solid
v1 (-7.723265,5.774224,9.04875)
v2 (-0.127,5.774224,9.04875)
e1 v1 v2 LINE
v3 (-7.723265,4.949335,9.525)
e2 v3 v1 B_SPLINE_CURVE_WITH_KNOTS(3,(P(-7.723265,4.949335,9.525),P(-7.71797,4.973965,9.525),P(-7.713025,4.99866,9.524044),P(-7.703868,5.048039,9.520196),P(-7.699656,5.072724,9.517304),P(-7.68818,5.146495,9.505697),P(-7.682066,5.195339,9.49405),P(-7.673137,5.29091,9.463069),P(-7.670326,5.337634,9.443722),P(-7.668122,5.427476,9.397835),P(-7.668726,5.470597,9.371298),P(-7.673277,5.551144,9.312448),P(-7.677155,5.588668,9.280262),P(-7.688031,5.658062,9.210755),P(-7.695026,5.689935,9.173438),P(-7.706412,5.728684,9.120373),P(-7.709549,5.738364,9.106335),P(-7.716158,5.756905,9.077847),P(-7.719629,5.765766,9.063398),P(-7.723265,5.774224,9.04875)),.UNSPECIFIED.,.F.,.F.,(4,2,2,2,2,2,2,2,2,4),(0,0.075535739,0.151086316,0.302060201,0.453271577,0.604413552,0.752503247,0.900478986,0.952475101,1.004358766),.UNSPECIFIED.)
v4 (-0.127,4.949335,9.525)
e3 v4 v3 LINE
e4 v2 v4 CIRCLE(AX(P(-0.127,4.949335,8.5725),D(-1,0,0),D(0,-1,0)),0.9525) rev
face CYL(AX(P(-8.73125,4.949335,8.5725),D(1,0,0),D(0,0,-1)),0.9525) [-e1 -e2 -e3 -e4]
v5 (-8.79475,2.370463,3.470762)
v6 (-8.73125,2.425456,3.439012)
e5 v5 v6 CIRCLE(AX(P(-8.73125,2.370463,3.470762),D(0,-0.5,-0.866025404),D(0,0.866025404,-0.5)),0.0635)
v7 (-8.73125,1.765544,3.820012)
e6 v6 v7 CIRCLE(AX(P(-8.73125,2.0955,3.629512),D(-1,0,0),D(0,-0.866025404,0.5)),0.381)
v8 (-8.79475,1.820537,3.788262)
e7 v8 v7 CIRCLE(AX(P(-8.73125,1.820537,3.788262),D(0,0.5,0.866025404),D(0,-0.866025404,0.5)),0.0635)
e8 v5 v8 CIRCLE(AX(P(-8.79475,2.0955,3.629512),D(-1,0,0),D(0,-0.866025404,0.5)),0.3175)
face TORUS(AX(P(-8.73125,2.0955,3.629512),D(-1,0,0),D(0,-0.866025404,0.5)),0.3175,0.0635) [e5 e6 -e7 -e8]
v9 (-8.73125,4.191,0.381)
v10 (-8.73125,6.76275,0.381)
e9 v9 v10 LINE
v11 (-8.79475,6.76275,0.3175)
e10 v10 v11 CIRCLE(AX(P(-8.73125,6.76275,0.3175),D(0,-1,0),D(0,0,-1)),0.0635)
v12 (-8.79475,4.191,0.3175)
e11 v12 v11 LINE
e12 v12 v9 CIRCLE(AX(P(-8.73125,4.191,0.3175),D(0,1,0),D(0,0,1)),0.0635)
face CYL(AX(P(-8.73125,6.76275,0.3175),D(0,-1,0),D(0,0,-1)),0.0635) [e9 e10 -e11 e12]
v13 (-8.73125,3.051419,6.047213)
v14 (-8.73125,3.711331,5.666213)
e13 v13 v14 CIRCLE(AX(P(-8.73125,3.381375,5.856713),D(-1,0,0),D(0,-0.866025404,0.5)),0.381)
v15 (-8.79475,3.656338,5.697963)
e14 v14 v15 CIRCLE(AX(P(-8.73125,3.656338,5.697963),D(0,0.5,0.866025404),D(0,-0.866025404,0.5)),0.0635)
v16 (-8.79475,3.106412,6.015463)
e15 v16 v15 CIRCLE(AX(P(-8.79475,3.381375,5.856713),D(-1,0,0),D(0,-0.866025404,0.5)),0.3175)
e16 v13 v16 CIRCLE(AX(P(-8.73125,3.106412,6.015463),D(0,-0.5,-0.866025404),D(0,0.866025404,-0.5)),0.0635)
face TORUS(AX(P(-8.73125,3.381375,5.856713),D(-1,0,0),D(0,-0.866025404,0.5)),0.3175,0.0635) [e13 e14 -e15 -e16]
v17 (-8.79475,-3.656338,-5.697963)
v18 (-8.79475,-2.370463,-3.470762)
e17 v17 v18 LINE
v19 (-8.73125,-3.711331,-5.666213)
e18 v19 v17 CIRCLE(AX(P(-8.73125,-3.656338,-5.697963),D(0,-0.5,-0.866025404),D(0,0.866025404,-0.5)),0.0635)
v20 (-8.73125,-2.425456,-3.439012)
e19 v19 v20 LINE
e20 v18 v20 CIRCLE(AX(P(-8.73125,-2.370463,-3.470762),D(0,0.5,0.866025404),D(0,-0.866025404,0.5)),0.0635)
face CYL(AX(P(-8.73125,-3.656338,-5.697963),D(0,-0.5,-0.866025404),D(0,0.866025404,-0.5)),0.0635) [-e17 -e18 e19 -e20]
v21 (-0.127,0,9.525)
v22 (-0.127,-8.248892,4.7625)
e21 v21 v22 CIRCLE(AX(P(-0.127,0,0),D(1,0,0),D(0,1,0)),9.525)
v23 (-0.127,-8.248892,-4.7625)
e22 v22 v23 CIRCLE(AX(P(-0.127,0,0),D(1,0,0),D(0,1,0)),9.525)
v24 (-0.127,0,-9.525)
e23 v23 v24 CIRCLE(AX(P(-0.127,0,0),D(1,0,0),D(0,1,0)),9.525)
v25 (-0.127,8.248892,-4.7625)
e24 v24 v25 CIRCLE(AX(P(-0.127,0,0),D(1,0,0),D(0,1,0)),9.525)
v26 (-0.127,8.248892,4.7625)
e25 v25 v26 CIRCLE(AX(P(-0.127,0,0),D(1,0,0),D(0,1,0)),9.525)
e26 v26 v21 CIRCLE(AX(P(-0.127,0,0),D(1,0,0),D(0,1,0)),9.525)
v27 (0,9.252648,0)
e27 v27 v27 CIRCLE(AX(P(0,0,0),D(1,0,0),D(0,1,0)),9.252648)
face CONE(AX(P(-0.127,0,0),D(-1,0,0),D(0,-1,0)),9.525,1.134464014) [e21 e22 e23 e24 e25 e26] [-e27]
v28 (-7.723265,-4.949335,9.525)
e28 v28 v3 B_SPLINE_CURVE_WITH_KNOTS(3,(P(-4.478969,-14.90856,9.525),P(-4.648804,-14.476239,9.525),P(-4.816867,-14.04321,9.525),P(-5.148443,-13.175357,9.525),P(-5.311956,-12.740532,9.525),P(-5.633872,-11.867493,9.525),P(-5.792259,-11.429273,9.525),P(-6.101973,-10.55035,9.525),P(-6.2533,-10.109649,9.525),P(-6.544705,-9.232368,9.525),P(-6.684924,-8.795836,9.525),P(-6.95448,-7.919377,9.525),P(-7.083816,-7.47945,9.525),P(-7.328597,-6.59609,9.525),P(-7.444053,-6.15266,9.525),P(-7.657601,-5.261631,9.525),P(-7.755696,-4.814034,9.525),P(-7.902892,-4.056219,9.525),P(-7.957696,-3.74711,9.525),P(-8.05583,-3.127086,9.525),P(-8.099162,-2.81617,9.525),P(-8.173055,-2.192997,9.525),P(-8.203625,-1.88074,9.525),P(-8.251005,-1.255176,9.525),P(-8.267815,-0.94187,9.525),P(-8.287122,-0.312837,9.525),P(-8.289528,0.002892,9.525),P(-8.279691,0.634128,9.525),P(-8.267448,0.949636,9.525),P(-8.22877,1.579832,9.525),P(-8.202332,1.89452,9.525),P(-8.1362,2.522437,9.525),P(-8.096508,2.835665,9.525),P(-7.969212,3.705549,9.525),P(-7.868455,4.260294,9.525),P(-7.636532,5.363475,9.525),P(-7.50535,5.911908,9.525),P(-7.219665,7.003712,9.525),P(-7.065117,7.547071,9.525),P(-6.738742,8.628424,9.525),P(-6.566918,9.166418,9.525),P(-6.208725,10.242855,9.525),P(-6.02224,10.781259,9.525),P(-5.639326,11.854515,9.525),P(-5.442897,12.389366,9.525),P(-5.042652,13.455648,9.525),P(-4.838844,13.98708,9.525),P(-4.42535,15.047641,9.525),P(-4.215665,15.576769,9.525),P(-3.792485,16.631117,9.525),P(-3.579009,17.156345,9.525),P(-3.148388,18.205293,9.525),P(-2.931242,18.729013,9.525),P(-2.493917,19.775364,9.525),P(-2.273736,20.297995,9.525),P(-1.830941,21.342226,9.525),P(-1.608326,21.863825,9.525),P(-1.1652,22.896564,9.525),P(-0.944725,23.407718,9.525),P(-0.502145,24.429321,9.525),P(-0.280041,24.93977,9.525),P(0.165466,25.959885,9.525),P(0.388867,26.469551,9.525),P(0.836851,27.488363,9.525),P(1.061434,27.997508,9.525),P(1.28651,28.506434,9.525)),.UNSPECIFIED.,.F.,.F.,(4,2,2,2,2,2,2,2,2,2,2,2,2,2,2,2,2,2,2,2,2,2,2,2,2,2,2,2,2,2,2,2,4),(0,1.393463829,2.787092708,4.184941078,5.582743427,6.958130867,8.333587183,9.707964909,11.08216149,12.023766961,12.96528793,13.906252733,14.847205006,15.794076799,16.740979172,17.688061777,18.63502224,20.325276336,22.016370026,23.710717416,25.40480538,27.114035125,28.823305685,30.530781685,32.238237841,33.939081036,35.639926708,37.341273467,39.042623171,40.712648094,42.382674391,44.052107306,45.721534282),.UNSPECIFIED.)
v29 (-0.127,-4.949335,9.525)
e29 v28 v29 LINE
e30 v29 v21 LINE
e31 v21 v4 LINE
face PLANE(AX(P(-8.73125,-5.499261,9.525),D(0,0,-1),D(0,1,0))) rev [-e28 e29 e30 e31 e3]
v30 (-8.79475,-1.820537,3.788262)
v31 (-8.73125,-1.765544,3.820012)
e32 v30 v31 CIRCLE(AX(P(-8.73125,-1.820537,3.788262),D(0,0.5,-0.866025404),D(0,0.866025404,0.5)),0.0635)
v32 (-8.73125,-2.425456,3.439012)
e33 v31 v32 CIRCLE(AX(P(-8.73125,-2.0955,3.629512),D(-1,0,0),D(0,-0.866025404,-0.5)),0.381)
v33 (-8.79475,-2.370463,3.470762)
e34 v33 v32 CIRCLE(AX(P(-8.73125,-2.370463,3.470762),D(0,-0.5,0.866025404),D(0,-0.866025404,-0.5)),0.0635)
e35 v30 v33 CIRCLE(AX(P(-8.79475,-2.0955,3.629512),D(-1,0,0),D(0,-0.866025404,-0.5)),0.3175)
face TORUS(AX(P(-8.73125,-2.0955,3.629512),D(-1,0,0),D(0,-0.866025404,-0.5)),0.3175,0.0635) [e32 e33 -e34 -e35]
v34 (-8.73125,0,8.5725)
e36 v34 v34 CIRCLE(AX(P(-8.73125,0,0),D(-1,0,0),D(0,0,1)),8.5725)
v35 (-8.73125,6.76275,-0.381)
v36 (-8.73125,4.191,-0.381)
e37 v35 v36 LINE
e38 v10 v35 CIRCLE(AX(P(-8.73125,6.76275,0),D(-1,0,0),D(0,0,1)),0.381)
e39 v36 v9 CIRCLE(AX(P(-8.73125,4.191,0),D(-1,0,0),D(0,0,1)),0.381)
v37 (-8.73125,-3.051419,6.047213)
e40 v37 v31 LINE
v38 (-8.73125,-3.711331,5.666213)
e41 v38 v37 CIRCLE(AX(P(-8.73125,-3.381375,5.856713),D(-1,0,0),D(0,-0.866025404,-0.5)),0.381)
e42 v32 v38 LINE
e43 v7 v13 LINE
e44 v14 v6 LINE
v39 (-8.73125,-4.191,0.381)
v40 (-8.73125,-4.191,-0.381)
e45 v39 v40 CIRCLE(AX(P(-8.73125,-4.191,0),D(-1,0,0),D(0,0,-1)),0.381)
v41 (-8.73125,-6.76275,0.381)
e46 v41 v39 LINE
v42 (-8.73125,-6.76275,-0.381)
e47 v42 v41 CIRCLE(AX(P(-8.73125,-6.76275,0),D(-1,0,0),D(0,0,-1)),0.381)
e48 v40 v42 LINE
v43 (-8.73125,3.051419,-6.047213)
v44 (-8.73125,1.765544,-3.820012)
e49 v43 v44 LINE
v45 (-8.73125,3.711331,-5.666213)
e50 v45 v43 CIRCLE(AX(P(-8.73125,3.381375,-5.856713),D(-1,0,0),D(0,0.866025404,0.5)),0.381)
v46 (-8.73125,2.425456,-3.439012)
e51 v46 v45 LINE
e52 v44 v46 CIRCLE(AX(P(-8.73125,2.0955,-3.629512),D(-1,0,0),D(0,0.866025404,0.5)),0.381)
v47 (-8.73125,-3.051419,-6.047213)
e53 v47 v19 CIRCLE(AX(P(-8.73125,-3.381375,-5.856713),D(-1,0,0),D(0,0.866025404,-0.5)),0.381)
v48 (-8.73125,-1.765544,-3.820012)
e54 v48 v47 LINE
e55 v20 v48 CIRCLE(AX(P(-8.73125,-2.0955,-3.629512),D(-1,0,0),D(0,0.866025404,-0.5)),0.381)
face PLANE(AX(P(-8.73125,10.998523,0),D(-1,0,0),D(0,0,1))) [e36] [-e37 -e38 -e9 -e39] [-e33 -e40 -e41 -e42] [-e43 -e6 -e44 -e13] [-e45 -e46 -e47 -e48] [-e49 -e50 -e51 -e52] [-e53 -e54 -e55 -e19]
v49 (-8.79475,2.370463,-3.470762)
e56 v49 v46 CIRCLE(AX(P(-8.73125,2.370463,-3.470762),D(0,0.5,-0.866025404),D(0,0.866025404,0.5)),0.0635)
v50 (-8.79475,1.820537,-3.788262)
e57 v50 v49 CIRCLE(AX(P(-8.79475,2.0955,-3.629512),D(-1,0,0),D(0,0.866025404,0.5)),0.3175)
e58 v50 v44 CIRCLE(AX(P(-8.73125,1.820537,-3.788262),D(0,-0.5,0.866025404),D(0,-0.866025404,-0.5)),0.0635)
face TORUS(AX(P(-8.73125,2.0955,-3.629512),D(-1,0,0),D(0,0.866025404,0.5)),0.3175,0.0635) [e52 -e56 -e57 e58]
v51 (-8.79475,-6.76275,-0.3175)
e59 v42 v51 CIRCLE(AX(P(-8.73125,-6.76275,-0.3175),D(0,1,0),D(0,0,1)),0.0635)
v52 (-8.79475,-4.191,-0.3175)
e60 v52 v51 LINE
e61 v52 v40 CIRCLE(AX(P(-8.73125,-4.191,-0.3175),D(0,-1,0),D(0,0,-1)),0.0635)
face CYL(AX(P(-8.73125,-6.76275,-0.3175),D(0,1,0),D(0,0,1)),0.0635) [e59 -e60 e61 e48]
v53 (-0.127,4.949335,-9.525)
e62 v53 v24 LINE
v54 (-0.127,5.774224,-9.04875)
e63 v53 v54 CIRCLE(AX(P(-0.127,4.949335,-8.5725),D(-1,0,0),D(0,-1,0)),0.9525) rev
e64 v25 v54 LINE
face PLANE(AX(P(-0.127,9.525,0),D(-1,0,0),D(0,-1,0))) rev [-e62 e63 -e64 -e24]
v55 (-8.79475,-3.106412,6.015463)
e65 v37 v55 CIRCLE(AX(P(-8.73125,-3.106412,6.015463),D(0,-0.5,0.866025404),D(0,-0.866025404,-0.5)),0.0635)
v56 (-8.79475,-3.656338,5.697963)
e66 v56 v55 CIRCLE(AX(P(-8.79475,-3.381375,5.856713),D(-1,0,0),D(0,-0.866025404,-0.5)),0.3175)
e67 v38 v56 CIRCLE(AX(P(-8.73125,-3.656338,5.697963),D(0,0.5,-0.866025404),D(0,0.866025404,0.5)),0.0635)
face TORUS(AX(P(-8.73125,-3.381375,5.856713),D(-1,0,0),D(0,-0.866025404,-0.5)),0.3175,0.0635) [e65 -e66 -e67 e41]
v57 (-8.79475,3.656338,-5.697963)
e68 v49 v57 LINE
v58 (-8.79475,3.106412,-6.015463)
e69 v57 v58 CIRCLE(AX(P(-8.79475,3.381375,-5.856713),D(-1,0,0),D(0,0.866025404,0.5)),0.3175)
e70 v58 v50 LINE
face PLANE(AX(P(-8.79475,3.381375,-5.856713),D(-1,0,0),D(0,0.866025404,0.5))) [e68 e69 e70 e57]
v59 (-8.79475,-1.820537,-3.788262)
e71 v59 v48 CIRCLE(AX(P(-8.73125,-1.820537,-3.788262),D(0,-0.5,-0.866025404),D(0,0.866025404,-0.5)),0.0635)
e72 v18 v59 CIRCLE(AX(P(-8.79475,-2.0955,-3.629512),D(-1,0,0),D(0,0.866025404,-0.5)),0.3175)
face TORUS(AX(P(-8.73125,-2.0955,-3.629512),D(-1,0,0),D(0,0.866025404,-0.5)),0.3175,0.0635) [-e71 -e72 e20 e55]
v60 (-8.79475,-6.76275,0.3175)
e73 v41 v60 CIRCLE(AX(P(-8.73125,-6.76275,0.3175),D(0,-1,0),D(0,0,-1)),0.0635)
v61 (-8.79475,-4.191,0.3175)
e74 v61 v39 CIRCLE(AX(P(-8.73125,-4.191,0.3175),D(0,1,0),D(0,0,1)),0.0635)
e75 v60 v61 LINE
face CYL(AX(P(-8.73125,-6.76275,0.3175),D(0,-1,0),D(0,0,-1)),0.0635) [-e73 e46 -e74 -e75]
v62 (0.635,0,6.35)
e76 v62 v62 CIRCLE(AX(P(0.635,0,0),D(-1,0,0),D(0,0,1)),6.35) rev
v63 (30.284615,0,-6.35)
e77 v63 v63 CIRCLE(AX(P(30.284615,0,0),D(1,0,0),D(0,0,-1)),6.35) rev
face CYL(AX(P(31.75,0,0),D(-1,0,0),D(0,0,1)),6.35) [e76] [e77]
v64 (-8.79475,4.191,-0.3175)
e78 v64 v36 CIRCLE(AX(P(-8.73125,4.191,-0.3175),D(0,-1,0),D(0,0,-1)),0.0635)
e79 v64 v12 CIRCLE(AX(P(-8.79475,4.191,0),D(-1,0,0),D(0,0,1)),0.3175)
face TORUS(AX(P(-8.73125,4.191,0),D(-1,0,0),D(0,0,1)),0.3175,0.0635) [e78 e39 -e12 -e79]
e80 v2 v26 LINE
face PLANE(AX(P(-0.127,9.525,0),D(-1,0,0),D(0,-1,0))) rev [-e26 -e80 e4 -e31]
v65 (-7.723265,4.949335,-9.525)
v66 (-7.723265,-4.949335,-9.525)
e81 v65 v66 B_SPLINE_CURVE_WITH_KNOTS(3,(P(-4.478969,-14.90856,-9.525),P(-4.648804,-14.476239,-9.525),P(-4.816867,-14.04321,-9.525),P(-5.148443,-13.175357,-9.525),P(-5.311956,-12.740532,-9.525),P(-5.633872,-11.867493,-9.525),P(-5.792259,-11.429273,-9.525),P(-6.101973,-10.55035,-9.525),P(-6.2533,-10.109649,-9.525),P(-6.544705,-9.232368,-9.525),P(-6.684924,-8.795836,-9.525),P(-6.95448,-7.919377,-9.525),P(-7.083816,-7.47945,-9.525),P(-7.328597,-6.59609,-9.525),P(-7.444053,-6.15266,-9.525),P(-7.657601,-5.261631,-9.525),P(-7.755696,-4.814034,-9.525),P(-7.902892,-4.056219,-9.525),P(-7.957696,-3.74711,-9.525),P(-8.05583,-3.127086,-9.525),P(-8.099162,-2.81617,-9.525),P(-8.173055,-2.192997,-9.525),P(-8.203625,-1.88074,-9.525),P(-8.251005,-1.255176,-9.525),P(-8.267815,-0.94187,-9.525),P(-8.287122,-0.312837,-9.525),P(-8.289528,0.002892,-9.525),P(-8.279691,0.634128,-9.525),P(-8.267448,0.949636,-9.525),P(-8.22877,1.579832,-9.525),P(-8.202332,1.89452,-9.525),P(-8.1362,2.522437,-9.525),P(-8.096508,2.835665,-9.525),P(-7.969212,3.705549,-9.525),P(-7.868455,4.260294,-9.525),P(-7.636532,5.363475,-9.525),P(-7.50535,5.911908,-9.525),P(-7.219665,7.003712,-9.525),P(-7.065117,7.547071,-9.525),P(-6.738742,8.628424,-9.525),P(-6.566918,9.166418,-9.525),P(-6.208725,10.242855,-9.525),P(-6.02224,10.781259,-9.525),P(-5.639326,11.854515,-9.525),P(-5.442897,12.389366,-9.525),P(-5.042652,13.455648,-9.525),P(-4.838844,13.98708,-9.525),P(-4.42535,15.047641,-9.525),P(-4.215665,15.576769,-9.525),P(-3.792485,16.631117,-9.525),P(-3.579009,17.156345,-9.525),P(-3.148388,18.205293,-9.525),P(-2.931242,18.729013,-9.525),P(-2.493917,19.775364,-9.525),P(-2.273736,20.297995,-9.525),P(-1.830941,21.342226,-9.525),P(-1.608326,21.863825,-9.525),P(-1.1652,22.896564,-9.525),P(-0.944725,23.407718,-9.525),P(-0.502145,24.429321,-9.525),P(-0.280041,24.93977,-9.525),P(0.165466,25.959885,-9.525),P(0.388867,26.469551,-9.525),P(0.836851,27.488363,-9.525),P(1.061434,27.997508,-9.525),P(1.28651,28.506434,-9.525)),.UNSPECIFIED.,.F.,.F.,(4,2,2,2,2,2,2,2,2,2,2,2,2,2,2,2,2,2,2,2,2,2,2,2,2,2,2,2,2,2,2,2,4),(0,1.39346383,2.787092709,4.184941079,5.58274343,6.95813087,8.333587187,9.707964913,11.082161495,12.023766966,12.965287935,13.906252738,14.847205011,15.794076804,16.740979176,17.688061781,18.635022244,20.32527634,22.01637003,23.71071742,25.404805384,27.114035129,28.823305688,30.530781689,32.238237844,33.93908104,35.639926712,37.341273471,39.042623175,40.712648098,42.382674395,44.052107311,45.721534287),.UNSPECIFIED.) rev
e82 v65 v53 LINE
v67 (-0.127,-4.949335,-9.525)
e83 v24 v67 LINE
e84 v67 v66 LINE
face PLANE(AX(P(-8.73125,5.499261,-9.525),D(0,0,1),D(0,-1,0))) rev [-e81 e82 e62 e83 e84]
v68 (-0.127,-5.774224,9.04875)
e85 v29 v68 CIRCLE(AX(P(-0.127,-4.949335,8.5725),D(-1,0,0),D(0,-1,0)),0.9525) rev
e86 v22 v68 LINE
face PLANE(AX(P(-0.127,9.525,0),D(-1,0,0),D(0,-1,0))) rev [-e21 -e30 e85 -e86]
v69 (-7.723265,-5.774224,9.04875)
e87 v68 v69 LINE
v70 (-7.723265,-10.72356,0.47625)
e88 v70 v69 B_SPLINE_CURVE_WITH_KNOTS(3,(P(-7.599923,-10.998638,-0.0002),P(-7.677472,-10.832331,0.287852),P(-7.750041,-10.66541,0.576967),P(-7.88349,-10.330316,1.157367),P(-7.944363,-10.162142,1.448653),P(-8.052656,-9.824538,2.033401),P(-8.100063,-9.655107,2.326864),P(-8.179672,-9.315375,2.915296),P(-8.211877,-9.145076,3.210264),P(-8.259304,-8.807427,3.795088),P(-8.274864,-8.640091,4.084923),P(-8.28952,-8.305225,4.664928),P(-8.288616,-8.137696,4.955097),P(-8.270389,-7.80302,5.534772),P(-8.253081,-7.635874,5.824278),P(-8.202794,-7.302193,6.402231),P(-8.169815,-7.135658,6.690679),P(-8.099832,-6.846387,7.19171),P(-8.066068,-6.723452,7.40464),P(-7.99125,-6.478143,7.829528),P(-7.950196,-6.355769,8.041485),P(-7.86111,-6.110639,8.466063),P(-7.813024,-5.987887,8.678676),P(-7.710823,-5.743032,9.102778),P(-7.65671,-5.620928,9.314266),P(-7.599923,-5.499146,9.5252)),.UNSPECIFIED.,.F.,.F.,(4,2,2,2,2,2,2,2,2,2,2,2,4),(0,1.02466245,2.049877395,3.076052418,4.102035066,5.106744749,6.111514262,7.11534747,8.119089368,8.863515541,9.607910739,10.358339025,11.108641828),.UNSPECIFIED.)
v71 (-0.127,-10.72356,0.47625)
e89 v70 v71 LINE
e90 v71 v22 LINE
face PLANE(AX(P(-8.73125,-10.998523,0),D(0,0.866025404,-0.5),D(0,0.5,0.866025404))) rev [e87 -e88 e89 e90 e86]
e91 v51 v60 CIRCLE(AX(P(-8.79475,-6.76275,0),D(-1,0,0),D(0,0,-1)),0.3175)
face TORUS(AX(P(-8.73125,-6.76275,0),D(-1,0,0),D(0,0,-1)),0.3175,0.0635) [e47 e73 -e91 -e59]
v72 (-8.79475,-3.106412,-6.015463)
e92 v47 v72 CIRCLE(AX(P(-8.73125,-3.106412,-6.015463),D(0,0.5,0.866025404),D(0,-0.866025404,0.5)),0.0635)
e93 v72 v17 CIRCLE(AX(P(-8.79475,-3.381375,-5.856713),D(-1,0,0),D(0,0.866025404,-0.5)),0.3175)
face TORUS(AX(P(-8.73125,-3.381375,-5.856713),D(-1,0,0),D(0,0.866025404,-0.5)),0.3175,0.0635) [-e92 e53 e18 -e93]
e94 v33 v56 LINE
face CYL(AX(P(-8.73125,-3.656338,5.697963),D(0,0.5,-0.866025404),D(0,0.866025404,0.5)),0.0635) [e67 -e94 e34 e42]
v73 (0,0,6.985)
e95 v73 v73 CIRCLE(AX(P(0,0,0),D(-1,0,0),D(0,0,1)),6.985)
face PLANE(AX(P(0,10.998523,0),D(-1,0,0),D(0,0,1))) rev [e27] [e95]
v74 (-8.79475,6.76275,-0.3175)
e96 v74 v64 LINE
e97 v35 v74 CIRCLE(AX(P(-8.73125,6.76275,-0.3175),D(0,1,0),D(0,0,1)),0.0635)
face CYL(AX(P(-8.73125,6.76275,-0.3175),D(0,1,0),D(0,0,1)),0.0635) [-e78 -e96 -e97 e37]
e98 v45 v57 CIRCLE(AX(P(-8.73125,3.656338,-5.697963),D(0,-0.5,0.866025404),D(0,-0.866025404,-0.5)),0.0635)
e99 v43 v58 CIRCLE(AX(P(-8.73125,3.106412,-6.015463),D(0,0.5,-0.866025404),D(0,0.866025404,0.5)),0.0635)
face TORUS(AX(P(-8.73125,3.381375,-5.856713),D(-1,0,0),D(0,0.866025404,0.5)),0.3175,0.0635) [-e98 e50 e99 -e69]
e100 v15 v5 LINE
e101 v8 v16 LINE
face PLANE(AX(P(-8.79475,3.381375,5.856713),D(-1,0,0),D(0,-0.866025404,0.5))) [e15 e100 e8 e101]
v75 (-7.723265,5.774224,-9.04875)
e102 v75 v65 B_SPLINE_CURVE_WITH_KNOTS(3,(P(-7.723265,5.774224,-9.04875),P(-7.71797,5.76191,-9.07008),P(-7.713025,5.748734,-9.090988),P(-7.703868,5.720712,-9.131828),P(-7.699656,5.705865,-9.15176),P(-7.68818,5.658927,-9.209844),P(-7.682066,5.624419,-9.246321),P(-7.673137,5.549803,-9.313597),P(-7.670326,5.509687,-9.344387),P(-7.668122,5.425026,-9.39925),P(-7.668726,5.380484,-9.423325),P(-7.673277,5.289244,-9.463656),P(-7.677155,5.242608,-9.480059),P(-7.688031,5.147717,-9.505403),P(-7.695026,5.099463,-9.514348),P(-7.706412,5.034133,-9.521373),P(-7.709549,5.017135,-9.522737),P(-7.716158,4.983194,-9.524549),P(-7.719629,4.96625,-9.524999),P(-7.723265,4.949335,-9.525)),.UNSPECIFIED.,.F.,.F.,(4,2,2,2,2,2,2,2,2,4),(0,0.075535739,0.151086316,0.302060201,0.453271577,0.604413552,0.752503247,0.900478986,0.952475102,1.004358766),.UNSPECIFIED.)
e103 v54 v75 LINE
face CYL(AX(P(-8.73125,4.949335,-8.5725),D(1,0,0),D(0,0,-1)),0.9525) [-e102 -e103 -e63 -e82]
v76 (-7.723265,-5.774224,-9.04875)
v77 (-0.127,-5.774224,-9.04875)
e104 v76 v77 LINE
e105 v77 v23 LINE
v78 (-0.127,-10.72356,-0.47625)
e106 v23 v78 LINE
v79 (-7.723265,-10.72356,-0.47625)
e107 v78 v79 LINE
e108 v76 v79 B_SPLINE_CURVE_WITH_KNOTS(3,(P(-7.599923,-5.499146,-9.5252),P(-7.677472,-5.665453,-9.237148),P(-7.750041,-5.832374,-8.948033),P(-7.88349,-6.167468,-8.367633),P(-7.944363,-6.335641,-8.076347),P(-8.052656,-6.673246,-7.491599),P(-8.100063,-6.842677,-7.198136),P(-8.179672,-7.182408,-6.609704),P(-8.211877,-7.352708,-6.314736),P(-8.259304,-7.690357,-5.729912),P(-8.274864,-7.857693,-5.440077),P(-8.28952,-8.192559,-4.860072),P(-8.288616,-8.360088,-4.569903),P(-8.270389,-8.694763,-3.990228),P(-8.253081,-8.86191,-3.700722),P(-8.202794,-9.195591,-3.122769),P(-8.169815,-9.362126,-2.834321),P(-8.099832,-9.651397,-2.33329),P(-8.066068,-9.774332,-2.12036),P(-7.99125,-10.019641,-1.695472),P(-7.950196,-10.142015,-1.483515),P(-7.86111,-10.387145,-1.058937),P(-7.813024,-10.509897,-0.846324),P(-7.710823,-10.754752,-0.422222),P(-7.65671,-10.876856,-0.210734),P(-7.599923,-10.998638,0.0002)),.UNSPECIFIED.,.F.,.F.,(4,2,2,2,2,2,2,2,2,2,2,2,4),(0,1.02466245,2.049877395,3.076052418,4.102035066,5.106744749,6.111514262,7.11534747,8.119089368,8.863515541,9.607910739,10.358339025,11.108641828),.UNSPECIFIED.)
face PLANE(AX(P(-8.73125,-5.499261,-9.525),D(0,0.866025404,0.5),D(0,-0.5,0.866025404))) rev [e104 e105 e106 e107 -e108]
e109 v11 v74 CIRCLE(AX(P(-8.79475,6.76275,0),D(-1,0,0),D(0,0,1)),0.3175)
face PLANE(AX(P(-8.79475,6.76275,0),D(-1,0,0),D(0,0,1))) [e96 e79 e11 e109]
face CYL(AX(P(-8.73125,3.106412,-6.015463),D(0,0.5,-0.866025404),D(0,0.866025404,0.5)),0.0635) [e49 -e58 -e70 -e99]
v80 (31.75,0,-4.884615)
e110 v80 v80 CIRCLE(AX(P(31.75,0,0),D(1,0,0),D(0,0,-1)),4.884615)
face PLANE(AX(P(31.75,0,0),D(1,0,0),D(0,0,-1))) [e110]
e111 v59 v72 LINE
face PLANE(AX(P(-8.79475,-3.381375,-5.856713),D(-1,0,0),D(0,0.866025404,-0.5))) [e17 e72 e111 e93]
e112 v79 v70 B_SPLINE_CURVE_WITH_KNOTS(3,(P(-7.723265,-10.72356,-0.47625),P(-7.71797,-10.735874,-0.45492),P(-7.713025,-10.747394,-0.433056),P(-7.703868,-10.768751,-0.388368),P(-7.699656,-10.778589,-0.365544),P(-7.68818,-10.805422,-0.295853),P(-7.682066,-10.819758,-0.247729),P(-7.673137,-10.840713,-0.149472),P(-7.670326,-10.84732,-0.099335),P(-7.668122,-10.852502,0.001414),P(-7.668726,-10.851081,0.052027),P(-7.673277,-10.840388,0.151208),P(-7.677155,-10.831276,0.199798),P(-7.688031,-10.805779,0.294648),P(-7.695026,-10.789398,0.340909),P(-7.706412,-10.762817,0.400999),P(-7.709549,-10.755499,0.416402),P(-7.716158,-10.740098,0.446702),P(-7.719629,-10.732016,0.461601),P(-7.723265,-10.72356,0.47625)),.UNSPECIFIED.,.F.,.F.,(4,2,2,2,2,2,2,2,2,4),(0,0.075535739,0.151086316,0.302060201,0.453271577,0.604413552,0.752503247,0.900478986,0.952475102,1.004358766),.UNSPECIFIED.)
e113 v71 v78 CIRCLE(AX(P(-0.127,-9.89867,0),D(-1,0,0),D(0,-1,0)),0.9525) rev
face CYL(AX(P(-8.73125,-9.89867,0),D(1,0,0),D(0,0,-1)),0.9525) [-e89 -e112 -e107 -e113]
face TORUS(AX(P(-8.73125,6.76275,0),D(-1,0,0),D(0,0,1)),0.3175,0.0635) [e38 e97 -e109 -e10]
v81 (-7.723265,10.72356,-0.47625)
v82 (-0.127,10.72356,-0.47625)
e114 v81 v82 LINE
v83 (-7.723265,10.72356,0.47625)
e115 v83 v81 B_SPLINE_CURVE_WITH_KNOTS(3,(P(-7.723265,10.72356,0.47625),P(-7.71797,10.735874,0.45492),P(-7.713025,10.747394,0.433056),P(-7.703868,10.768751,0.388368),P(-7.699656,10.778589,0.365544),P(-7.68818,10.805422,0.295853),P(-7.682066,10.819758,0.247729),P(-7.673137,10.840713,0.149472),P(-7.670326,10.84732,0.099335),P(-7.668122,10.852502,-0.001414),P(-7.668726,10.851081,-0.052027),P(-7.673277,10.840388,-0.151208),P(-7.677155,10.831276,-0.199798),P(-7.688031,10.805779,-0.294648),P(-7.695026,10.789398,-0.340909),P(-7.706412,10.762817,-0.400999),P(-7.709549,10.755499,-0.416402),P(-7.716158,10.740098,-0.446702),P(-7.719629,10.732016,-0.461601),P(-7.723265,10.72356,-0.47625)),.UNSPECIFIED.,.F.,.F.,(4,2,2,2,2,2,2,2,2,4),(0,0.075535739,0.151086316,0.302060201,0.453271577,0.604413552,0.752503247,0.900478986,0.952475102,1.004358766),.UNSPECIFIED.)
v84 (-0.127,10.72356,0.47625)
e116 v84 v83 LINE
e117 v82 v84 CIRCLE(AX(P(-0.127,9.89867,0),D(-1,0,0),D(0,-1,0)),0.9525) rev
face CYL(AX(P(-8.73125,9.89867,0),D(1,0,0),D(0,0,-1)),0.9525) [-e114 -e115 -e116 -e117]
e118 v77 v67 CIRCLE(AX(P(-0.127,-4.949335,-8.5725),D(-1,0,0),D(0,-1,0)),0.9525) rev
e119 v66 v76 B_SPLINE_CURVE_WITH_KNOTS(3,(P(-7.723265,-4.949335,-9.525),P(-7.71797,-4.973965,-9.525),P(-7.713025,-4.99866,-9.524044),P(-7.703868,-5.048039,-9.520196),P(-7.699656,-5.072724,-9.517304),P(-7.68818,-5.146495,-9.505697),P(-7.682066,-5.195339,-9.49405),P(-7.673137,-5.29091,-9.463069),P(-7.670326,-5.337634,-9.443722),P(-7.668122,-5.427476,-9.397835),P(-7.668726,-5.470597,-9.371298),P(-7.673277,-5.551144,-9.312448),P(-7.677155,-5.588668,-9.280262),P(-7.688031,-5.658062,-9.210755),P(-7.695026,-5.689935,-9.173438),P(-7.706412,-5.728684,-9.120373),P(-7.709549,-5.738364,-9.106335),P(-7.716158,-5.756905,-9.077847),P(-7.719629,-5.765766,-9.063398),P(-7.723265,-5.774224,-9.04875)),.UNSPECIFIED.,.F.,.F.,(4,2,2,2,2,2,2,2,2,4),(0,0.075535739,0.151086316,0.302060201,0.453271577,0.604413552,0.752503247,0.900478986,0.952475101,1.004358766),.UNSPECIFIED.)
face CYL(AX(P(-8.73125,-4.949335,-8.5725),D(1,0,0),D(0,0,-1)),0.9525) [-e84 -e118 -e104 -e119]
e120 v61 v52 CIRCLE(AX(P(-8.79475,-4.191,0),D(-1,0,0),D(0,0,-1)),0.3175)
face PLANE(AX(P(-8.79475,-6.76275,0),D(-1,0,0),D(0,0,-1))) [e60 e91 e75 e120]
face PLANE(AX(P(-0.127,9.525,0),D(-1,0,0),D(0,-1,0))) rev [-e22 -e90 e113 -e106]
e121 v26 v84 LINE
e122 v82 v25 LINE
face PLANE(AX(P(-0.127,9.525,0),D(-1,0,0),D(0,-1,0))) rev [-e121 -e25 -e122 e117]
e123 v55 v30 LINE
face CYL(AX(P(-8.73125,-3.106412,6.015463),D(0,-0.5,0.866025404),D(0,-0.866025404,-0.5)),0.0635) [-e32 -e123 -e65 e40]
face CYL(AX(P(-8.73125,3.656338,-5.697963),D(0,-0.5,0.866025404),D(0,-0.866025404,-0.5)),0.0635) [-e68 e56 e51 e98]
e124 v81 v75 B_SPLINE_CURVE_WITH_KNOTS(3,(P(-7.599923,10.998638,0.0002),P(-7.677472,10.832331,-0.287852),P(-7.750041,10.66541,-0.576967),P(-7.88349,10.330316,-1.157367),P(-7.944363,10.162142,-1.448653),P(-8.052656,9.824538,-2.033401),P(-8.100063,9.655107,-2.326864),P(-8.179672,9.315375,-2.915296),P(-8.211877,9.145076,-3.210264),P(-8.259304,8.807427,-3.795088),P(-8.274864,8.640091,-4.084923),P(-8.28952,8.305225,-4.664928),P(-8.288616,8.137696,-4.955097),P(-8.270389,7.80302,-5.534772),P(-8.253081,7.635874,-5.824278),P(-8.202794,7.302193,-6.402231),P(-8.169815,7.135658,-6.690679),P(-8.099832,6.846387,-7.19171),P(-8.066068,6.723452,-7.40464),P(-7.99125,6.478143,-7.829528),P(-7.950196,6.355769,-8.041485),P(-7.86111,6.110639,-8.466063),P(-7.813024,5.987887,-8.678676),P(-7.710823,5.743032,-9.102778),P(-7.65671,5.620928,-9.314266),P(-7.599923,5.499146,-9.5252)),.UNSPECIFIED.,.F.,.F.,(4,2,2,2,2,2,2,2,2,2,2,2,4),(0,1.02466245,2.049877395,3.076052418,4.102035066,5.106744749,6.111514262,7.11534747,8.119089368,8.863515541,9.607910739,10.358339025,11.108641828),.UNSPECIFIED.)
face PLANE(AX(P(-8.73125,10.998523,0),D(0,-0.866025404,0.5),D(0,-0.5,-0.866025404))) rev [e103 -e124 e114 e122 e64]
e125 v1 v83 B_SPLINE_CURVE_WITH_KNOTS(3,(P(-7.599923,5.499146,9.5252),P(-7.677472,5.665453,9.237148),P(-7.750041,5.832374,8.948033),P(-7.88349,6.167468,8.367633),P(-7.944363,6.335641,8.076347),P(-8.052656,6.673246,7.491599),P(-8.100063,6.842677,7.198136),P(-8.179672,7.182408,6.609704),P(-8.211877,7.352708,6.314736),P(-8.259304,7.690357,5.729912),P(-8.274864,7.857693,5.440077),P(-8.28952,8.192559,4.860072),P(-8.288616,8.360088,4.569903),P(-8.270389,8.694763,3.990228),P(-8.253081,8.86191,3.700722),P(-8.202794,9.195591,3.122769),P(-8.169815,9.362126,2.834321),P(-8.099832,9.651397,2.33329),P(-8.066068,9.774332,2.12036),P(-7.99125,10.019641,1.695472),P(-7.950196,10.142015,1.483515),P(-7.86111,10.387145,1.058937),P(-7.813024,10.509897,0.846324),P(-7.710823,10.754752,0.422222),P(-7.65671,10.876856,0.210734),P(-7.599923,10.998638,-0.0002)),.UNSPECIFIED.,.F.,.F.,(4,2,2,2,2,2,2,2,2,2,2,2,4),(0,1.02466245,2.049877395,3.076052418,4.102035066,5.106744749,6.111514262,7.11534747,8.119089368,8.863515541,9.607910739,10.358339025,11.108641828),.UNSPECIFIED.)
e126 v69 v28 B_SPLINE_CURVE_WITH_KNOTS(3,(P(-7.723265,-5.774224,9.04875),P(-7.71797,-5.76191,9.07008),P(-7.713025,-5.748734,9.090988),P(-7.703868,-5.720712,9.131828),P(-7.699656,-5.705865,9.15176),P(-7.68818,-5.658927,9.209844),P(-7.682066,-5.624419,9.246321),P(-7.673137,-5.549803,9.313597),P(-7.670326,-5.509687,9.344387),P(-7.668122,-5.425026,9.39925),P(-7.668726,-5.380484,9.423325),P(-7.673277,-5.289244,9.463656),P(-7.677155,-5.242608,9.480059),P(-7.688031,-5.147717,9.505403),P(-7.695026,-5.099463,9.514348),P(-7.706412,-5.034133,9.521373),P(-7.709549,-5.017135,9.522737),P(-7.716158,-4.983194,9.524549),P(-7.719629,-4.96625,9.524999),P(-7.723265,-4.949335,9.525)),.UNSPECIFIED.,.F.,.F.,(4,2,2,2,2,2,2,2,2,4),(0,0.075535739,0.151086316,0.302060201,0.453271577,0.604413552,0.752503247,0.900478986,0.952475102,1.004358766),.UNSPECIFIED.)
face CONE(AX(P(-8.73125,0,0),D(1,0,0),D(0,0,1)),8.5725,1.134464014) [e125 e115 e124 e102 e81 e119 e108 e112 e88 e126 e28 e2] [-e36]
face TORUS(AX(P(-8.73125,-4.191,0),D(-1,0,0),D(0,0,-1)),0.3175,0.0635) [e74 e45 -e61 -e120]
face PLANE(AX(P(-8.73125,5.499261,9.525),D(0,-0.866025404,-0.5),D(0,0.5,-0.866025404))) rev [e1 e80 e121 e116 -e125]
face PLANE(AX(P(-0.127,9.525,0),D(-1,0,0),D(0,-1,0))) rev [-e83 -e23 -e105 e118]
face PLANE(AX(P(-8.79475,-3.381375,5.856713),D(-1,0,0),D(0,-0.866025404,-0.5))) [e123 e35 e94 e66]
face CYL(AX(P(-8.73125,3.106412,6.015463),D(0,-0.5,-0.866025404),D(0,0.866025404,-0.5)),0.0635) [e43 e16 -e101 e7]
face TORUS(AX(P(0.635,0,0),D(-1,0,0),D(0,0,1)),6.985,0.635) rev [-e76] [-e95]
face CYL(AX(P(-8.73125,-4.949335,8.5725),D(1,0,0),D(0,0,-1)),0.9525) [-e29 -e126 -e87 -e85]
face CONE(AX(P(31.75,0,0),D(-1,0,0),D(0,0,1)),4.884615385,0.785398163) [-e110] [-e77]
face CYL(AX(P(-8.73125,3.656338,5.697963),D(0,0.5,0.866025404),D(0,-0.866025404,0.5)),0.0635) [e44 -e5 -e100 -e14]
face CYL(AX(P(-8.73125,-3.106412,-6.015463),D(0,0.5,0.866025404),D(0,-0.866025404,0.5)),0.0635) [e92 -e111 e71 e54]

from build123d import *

# Parameters (mm, degrees)
SKETCH2_R                = 6.35
BOSS_EXTRUDE1_DEPTH      = 31.75
BOSS_EXTRUDE2_DEPTH      = 8.73125
SKETCH5_OUTSIDE_W        = 68.47
SKETCH5_OUTSIDE_H        = 71.418
SKETCH5_OUTSIDE_R        = 8.5725
CUT_EXTRUDE1_DEPTH       = 8.73125
CUT_EXTRUDE1_DRAFT       = -65
BOSS_EXTRUDE5_DEPTH      = 0.0635
FILLET5_R                = 0.0635
CIRPATTERN1_COUNT        = 6
FILLET5_OF_CIRPATTERN1_R = 0.0635
FILLET7_R                = 0.9525
CHAMFER1_SIZE            = 1.465384615
FILLET4_R                = 0.635


with BuildPart() as part:
    # Sketch2 → Boss-Extrude1 (new body)
    with BuildSketch(Plane(origin=(0, 0, 0), x_dir=(0, 0, -1), z_dir=(1, 0, 0))):
        Circle(SKETCH2_R)
    extrude(amount=BOSS_EXTRUDE1_DEPTH)

    # Sketch3 → Boss-Extrude2 (add)
    with BuildSketch(Plane.ZY):
        Polygon((0, 10.998522628), (-9.525, 5.499261314), (-9.525, -5.499261314), (0, -10.998522628), (9.525, -5.499261314), (9.525, 5.499261314), align=None)
    extrude(amount=BOSS_EXTRUDE2_DEPTH)


with BuildPart() as cut_extrude1_tool:
    # Sketch5 outside → Cut-Extrude1 (with draft: the straight prism first)
    with BuildSketch(Plane.ZY.offset(8.73125)):
        Rectangle(SKETCH5_OUTSIDE_W, SKETCH5_OUTSIDE_H)
        Circle(SKETCH5_OUTSIDE_R, mode=Mode.SUBTRACT)
    extrude(amount=-CUT_EXTRUDE1_DEPTH)
    # Cut-Extrude1: the draft: its side faces are tilted about the plane it starts from
    cut_extrude1_sides = [cut_extrude1_tool.faces().sort_by_distance(p)[0] for p in [
        (-4.365625, -35.709, 0),
        (-4.365625, 0, 34.235),
        (-4.365625, 35.709, 0),
        (-4.365625, 0, -34.235),
        (-4.365625, 0, -8.5725),
    ]]
    draft(cut_extrude1_sides, Plane.ZY.offset(8.73125), CUT_EXTRUDE1_DRAFT)


with BuildPart() as part_1:
    add(part.part)

    # Cut-Extrude1: cut by cut_extrude1_tool
    add(cut_extrude1_tool.part, mode=Mode.SUBTRACT)

    # Sketch11 → Boss-Extrude5 (add)
    with BuildSketch(Plane.ZY.offset(8.73125)):
        with BuildLine():
            Line((0.381, 6.76275), (0.381, 4.191))
            ThreePointArc((0.381, 4.191), (0, 3.81), (-0.381, 4.191))
            Line((-0.381, 4.191), (-0.381, 6.76275))
            ThreePointArc((-0.381, 6.76275), (0, 7.14375), (0.381, 6.76275))
        make_face()
    boss_extrude5 = extrude(amount=BOSS_EXTRUDE5_DEPTH)

    # Fillet5
    fillet5_edges = [part_1.edges().sort_by_distance(p)[0] for p in [
        (-8.79475, 5.476875, 0.381),
        (-8.79475, 3.81, 0),
        (-8.79475, 5.476875, -0.381),
        (-8.79475, 7.14375, 0),
    ]]
    fillet(fillet5_edges, radius=FILLET5_R - 0.0001)  # a hair under: the kernel refuses the full size

    # CirPattern1: Boss-Extrude5 ×6 about axis
    cirpattern1_axis = Axis((0, 0, 0), (1, 0, 0))
    for i in range(1, CIRPATTERN1_COUNT):
        add(boss_extrude5.rotate(cirpattern1_axis, i * 360 / CIRPATTERN1_COUNT))

    # Fillet5 of CirPattern1
    fillet5_of_cirpattern1_edges = [part_1.edges().sort_by_distance(p)[0] for p in [
        (-8.79475, 2.408481821, 4.933612883),
        (-8.79475, 1.905, 3.299556788),
        (-8.79475, 3.068393179, 4.552612883),
        (-8.79475, 3.571875, 6.186668978),
        (-8.79475, -3.068393179, 4.552612883),
        (-8.79475, -1.905, 3.299556788),
        (-8.79475, -2.408481821, 4.933612883),
        (-8.79475, -3.571875, 6.186668978),
        (-8.79475, -5.476875, -0.381),
        (-8.79475, -3.81, 0),
        (-8.79475, -5.476875, 0.381),
        (-8.79475, -7.14375, 0),
        (-8.79475, -2.408481821, -4.933612883),
        (-8.79475, -1.905, -3.299556788),
        (-8.79475, -3.068393179, -4.552612883),
        (-8.79475, -3.571875, -6.186668978),
        (-8.79475, 3.068393179, -4.552612883),
        (-8.79475, 1.905, -3.299556788),
        (-8.79475, 2.408481821, -4.933612883),
        (-8.79475, 3.571875, -6.186668978),
    ]]
    fillet(fillet5_of_cirpattern1_edges, radius=FILLET5_OF_CIRPATTERN1_R - 0.0001)  # a hair under: the kernel refuses the full size

    # Fillet7
    fillet7_edges = [part_1.edges().sort_by_distance(p)[0] for p in [
        (-3.799988535, -10.998522628, 0),
        (-3.799988535, -5.499261314, -9.525),
        (-3.799988535, 5.499261314, -9.525),
        (-3.799988535, 10.998522628, 0),
        (-3.799988535, -5.499261314, 9.525),
        (-3.799988535, 5.499261314, 9.525),
    ]]
    fillet(fillet7_edges, radius=FILLET7_R)

    # Chamfer1
    chamfer1_edges = [part_1.edges().sort_by_distance(p)[0] for p in [
        (31.75, 0, 6.35),
    ]]
    chamfer(chamfer1_edges, length=CHAMFER1_SIZE)

    # Sketch15 → Cut-Revolve1 (revolve, cut)
    with BuildSketch(Plane.XY, mode=Mode.PRIVATE) as cut_revolve1_sk:
        Polygon((0, 9.252647621), (-0.127, 9.525), (-0.127, 10.998522628), (0, 10.998522628), align=None)
    revolve(cut_revolve1_sk.sketch.rotate(Axis((0, 0, 0), (-1, 0, 0)), 210), axis=Axis((0, 0, 0), (-1, 0, 0)), mode=Mode.SUBTRACT)

    # Fillet4
    fillet4_edges = [part_1.edges().sort_by_distance(p)[0] for p in [
        (0, 0, 6.35),
    ]]
    fillet(fillet4_edges, radius=FILLET4_R)


solid = part_1.part
